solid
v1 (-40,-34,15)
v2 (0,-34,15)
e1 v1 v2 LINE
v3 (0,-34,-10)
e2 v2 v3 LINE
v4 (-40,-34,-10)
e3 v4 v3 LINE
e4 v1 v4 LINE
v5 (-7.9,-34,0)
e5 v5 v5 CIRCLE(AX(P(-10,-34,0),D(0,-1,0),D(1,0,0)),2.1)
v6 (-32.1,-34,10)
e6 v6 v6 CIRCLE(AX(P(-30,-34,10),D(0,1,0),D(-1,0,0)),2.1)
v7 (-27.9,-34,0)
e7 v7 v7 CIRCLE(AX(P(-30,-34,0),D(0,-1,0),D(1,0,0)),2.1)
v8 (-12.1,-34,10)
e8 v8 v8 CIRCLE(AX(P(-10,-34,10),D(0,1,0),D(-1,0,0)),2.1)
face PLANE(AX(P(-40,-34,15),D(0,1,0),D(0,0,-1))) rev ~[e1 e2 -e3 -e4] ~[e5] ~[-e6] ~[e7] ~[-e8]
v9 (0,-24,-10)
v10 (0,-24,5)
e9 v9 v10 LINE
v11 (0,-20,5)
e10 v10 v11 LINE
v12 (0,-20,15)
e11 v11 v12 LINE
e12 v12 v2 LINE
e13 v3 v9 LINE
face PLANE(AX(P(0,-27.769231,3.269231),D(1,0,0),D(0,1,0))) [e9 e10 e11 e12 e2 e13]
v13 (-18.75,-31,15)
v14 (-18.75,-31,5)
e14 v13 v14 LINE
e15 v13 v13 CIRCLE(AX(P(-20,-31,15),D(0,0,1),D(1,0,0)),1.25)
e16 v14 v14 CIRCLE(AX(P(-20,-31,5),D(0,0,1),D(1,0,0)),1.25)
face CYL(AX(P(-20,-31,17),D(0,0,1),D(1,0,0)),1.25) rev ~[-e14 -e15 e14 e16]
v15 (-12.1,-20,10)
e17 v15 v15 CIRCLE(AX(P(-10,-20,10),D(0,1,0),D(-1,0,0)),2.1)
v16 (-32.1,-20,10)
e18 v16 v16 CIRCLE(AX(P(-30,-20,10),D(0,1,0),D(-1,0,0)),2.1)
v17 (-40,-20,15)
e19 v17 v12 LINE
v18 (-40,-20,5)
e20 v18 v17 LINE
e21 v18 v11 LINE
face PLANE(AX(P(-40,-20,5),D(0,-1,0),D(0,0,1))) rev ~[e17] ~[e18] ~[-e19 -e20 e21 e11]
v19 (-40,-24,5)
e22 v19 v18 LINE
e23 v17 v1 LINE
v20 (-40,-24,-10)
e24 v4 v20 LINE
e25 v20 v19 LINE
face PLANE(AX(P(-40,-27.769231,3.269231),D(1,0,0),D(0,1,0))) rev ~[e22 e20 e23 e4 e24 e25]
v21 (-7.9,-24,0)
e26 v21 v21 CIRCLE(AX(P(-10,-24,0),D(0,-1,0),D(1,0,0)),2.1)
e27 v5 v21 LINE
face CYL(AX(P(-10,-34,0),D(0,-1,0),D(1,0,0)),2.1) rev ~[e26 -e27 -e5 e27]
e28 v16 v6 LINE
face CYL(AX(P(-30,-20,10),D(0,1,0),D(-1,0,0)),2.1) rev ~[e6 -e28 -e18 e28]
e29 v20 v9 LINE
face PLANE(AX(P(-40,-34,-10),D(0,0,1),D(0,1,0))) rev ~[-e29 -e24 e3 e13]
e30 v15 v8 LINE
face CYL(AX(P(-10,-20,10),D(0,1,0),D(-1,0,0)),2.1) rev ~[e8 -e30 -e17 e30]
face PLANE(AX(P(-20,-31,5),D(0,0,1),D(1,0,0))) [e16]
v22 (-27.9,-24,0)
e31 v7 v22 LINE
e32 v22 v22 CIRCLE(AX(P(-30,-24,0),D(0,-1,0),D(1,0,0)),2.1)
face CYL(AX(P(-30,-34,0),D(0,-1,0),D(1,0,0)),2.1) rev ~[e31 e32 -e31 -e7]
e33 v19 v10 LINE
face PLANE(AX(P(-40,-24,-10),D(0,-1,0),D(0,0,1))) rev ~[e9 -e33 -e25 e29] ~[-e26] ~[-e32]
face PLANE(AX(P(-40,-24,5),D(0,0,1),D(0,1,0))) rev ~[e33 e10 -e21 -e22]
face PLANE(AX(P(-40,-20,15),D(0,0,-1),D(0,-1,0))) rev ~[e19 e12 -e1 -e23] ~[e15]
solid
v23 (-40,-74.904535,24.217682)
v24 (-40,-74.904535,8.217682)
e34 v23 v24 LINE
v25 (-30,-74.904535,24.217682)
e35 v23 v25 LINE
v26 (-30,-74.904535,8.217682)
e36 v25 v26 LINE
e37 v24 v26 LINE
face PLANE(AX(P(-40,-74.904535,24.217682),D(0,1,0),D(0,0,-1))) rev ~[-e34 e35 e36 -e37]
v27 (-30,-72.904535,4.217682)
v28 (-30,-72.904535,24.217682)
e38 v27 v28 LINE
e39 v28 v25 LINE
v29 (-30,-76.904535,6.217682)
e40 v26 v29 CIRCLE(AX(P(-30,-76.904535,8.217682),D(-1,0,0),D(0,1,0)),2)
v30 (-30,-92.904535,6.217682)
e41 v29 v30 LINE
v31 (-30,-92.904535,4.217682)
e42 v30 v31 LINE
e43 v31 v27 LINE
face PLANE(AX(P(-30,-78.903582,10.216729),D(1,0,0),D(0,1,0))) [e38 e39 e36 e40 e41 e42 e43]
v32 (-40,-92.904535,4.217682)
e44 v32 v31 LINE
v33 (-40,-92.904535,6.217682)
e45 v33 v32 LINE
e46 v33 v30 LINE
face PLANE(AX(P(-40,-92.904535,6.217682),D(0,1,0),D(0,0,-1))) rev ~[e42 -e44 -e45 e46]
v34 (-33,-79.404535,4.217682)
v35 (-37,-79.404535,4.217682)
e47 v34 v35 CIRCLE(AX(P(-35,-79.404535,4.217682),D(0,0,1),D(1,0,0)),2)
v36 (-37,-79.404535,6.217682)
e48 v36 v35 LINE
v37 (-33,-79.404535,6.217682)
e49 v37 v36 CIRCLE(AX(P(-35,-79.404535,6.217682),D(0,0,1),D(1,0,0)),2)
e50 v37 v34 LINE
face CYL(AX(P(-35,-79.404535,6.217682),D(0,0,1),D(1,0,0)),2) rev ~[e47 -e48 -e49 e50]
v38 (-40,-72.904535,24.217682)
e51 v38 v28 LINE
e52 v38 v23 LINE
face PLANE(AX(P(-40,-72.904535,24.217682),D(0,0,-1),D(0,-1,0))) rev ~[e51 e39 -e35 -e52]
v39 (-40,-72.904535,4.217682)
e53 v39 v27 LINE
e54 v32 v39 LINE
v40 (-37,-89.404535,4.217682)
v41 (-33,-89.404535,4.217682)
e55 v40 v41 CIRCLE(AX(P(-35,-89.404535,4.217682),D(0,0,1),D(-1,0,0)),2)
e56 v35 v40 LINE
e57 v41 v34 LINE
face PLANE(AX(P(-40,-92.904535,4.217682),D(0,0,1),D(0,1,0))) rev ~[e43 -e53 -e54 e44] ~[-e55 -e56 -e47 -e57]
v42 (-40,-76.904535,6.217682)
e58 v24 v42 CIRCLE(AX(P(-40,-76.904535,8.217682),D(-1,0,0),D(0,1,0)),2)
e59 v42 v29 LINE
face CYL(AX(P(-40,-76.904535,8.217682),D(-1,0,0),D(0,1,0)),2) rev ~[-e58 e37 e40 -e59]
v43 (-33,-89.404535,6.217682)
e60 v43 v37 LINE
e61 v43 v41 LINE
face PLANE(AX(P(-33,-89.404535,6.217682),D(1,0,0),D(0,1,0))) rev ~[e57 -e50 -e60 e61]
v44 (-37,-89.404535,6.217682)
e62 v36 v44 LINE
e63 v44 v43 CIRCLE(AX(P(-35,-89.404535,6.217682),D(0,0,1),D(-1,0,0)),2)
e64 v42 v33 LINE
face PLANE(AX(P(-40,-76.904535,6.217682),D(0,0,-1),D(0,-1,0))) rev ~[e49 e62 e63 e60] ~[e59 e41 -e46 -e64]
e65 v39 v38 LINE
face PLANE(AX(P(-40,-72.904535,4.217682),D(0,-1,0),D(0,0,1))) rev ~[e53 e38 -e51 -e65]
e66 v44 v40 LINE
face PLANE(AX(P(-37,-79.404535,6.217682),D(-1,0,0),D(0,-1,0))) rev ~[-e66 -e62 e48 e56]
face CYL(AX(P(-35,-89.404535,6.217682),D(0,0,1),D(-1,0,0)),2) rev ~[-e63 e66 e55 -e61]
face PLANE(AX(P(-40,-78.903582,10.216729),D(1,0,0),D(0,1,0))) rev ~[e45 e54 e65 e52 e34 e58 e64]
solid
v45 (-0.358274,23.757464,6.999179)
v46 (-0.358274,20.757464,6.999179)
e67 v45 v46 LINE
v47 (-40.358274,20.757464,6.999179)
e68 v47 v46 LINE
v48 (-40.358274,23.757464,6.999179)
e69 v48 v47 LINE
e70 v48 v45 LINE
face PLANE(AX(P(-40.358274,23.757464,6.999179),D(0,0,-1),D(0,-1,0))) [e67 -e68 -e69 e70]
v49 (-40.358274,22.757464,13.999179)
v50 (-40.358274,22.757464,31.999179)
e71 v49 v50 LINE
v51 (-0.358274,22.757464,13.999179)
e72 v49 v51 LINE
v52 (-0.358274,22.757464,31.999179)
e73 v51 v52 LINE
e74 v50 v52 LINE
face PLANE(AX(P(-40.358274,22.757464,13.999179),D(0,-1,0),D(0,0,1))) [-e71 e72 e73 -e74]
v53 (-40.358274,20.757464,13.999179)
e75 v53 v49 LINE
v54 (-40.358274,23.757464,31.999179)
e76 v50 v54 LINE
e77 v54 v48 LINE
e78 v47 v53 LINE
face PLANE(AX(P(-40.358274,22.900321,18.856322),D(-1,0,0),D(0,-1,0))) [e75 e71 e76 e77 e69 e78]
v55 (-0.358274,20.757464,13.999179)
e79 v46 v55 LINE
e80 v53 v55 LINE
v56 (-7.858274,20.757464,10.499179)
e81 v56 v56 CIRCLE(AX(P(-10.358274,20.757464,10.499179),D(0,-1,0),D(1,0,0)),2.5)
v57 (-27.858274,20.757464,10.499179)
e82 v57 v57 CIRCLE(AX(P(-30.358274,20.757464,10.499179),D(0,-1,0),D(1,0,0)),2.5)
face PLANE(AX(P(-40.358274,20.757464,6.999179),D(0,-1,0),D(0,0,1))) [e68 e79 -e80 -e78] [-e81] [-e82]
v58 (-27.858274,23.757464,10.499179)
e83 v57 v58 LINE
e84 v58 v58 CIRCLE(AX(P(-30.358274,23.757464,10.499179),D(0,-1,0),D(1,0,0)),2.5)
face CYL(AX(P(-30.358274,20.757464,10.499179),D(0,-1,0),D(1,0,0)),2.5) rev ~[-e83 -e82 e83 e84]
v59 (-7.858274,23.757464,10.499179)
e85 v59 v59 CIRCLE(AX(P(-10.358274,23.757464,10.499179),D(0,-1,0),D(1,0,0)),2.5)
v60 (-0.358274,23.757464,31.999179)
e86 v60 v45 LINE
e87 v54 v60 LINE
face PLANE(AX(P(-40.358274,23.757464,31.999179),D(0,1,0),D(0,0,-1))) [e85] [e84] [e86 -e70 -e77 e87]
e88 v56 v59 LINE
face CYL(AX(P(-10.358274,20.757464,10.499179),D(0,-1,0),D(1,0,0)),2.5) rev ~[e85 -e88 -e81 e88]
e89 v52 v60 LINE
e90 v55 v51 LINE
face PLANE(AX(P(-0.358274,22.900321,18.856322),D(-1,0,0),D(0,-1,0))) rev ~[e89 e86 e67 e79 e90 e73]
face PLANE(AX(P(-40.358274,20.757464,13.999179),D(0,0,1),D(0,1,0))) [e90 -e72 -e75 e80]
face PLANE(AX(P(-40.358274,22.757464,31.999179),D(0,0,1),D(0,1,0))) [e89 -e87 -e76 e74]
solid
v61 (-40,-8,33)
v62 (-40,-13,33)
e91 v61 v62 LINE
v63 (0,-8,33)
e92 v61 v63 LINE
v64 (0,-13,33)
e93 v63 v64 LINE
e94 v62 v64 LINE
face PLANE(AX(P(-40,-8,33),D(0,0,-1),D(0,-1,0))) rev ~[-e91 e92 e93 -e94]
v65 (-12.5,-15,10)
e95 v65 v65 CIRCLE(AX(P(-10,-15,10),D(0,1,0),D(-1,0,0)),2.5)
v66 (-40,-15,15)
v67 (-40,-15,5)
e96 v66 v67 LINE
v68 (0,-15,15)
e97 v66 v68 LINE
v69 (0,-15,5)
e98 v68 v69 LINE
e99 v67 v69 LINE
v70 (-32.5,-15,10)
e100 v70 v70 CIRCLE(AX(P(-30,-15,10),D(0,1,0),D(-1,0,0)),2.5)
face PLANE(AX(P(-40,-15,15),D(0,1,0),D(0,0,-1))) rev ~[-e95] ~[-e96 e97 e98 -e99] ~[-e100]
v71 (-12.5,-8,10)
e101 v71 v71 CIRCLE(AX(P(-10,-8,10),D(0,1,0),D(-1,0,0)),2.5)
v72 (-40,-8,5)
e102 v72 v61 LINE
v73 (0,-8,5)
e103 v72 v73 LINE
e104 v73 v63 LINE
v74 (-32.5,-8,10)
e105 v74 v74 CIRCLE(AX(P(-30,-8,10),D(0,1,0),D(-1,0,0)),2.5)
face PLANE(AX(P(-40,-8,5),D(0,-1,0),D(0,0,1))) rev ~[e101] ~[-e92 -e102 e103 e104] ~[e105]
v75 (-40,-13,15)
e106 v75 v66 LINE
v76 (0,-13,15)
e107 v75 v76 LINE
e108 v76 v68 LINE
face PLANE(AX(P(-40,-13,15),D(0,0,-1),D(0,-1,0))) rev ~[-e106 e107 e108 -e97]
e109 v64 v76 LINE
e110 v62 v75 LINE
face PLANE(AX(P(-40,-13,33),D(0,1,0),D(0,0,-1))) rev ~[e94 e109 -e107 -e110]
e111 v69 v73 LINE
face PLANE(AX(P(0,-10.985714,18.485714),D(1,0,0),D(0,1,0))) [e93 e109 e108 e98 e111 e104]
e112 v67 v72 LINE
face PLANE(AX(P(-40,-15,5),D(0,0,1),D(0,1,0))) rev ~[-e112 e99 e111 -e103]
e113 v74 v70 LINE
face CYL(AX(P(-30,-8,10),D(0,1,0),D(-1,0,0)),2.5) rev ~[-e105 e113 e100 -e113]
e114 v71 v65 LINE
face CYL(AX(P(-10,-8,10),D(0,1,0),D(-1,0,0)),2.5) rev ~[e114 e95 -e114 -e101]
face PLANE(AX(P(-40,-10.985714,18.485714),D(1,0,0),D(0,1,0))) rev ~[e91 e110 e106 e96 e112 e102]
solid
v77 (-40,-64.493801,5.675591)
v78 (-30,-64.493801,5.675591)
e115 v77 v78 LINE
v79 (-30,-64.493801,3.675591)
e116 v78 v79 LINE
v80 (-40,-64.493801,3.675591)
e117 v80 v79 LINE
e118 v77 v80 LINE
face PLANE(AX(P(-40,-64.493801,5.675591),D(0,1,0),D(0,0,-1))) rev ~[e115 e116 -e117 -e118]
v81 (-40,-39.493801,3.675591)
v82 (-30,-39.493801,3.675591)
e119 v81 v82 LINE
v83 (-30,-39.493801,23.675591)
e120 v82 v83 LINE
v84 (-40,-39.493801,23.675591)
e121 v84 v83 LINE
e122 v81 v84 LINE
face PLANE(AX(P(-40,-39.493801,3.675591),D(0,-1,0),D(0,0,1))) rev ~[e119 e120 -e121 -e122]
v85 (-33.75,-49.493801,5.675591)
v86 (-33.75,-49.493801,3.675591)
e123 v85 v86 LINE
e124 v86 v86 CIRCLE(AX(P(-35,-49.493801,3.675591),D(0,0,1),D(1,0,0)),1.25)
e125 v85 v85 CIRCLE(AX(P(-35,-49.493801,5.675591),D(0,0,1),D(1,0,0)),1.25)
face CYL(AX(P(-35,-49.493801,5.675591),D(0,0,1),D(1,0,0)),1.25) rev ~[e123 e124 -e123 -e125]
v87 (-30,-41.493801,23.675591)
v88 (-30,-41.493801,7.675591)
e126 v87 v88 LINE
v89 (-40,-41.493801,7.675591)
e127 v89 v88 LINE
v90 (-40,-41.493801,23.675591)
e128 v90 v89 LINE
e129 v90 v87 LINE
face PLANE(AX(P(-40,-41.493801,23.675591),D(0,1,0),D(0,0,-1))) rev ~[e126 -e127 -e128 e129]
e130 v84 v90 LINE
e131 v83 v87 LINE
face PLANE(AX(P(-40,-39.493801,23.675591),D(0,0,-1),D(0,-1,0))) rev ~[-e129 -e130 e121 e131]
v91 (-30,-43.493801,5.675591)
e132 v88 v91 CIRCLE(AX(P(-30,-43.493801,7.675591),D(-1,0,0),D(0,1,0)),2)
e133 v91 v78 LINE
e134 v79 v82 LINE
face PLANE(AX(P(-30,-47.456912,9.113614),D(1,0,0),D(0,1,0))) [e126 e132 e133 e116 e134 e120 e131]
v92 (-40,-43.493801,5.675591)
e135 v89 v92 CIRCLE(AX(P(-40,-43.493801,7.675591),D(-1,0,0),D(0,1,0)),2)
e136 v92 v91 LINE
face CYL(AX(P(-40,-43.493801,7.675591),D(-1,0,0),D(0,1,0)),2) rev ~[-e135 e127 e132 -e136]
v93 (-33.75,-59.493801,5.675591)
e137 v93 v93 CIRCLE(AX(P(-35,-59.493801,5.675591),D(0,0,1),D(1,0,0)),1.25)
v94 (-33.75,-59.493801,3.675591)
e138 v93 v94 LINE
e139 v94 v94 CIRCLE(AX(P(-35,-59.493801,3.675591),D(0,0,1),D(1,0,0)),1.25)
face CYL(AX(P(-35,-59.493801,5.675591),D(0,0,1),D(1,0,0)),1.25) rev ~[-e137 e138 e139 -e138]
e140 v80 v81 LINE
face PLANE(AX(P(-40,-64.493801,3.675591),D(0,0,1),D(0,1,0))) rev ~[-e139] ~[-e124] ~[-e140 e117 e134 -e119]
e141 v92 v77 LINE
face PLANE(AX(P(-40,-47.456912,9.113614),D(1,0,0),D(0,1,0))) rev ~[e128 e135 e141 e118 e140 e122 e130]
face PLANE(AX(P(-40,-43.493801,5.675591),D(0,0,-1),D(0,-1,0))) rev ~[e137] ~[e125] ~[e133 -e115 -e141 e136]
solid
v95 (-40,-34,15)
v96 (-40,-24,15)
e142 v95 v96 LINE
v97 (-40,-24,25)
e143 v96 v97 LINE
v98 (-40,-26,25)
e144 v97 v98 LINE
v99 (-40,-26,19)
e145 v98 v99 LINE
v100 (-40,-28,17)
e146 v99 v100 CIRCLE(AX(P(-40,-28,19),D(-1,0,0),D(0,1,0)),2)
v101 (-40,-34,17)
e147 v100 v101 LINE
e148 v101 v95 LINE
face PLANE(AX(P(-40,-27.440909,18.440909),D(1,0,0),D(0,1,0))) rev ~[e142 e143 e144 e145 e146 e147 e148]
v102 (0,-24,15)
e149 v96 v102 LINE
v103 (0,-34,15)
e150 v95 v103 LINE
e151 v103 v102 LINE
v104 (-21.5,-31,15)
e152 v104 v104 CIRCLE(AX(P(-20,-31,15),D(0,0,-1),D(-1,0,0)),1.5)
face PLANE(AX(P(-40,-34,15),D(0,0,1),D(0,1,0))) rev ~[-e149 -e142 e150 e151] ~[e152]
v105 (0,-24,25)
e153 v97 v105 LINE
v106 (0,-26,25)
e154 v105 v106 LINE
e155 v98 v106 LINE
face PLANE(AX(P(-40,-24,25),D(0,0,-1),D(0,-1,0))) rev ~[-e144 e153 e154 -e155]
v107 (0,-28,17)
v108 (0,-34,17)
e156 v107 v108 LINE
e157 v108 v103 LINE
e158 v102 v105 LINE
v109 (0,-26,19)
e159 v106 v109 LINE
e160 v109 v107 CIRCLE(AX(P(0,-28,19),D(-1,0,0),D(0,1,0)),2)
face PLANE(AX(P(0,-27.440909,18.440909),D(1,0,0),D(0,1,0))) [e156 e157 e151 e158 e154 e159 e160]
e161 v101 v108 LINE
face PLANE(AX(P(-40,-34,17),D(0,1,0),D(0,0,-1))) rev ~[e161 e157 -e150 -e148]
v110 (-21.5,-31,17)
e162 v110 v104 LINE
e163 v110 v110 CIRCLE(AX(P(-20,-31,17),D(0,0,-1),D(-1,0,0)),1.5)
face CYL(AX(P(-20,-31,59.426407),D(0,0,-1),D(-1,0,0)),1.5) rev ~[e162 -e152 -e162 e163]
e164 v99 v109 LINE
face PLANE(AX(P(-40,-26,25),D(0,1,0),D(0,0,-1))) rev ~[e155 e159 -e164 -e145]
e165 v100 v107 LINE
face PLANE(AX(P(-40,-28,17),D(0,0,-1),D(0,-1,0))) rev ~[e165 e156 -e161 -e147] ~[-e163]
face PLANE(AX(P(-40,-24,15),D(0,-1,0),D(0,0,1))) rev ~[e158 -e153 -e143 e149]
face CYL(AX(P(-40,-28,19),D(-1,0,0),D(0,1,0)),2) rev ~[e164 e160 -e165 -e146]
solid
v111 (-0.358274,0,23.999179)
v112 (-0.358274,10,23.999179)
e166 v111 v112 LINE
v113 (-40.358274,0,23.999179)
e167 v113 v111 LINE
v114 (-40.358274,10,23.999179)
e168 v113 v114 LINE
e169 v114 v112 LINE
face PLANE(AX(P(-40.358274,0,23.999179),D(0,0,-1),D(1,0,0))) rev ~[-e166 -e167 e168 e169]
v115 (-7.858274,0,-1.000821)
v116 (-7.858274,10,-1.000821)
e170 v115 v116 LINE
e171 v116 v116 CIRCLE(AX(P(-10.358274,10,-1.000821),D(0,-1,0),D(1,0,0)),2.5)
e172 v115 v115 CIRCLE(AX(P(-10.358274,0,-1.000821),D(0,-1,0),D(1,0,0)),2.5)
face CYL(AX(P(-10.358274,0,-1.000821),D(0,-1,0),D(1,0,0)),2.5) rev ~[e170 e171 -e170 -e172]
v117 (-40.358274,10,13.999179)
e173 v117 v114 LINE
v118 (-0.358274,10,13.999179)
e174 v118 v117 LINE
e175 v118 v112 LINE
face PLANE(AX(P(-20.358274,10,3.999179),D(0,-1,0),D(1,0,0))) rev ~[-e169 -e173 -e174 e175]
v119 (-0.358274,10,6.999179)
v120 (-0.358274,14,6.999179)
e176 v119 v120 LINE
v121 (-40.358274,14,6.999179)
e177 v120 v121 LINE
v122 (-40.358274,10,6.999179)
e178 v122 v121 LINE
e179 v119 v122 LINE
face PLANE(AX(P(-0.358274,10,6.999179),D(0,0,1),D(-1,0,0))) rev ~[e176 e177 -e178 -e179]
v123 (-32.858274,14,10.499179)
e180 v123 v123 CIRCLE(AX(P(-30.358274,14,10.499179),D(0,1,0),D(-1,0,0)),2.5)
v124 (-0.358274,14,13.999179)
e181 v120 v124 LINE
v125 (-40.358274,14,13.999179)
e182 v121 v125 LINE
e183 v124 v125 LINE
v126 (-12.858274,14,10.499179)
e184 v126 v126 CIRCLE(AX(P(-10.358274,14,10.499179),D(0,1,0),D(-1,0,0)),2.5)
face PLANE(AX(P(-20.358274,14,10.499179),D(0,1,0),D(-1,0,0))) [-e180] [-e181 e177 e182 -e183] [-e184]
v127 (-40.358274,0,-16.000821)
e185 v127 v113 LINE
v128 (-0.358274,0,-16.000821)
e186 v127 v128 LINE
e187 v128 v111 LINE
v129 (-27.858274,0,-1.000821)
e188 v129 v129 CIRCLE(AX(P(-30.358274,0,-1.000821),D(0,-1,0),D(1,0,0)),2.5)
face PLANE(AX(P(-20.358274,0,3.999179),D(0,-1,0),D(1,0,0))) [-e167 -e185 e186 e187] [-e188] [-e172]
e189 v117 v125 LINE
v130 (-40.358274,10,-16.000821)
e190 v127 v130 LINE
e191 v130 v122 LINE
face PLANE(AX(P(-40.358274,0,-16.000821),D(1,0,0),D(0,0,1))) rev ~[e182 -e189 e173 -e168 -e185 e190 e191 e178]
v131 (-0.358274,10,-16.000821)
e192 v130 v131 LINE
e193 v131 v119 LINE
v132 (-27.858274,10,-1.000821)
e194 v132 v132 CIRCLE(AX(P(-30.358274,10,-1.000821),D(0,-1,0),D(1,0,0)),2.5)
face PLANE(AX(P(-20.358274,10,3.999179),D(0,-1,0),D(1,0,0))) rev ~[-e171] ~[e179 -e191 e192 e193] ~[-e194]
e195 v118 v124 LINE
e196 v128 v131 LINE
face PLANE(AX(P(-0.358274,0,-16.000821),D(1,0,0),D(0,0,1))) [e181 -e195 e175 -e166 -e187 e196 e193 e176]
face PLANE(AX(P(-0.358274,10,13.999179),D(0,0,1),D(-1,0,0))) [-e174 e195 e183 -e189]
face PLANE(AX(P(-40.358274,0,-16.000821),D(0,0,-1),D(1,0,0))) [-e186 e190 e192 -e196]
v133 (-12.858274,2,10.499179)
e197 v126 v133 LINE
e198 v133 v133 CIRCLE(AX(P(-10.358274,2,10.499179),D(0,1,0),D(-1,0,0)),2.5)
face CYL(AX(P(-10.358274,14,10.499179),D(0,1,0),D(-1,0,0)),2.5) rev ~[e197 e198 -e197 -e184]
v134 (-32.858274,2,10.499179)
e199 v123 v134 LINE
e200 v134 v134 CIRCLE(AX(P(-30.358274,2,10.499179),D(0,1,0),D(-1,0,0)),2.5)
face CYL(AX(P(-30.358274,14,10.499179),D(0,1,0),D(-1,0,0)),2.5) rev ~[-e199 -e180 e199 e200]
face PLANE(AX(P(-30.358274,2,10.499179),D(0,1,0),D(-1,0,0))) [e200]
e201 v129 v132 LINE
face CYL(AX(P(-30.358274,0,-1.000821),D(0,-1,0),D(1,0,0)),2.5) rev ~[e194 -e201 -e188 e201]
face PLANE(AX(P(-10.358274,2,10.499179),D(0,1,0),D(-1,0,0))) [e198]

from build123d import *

# Parameters (mm, degrees)
F1_W      = 40
F1_H      = 40
F1_R      = 2.5
F2_DEPTH  = 10
F3_W      = 40
F3_H      = 7
F4_DEPTH  = 4
F5_R      = 2.5
F6_DEPTH  = 12
F8_DEPTH  = 40
F9_R      = 2.5
F10_DEPTH = 3
F12_DEPTH = 40
F14_DEPTH = 40
F18_DEPTH = 40
F15_R     = 2.1
F20_DEPTH = 10
F16_R     = 2.5
F21_DEPTH = 7
F19_R     = 1.25
F22_DEPTH = 12
F24_DEPTH = 10
F25_R     = 1.25
F26_DEPTH = 2
F28_DEPTH = 10
F30_DEPTH = 3
F31_R     = 2.1
F32_DEPTH = 14
F33_D     = 3


# Not quite as in the source:
# - a feature names something its author has since deleted; it is built from what else it names


with BuildPart() as f2:
    # F1 (on Front) → F2 (new body)
    with BuildSketch(Plane.XZ):
        with Locations((-20.3582742298, 3.9991794988)):
            Rectangle(F1_W, F1_H)
        with Locations((-30.3582742298, -1.0008205012)):
            Circle(F1_R, mode=Mode.SUBTRACT)
        with Locations((-10.3582742298, -1.0008205012)):
            Circle(F1_R, mode=Mode.SUBTRACT)
    extrude(amount=-F2_DEPTH)

    # F3 (on face) → F4 (join)
    with BuildSketch(Plane(origin=(0, 10, 0), x_dir=(-1, 0, 0), z_dir=(0, 1, 0))):
        with Locations((20.3582742298, 10.4991794988)):
            Rectangle(F3_W, F3_H)
    extrude(amount=F4_DEPTH)

    # F5 (on face) → F6 (cut)
    with BuildSketch(Plane(origin=(0, 14, 0), x_dir=(-1, 0, 0), z_dir=(0, 1, 0))):
        with Locations((10.3582742298, 10.4991794988)):
            Circle(F5_R)
        with Locations((30.3582742298, 10.4991794988)):
            Circle(F5_R)
    extrude(amount=-F6_DEPTH, mode=Mode.SUBTRACT)


with BuildPart() as f8:
    # F7 (on face) → F8 (new body)
    with BuildSketch(Plane(origin=(-40.3582742298, 0, 0), x_dir=(0, -1, 0), z_dir=(-1, 0, 0))):
        Polygon((-22.7574642788, 31.9991794988), (-23.7574642788, 31.9991794988), (-23.7574642788, 6.9991794988), (-20.7574642788, 6.9991794988), (-20.7574642788, 13.9991794988), (-22.7574642788, 13.9991794988), align=None)
    extrude(amount=-F8_DEPTH)

    # F9 (on face) → F10 (cut)
    with BuildSketch(Plane.XZ.offset(-20.7574642788)):
        with Locations((-30.3582742298, 10.4991794988)):
            Circle(F9_R)
        with Locations((-10.3582742298, 10.4991794988)):
            Circle(F9_R)
    extrude(amount=-F10_DEPTH, mode=Mode.SUBTRACT)


with BuildPart() as f12:
    # F11 (on offset) → F12 (new body)
    with BuildSketch(Plane.YZ.offset(-40)):
        Polygon((-20, 5), (-20, 15), (-34, 15), (-34, -10), (-24, -10), (-24, 5), align=None)
    extrude(amount=F12_DEPTH)

    # F15 (on face) → F20 (cut)
    with BuildSketch(Plane.XZ.offset(34)):
        with Locations((-30, 0)):
            Circle(F15_R)
        with Locations((-10, 0)):
            Circle(F15_R)
    extrude(amount=-F20_DEPTH, mode=Mode.SUBTRACT)


with BuildPart() as f14:
    # F13 (on offset) → F14 (new body)
    with BuildSketch(Plane.YZ.offset(-40)):
        Polygon((-8, 5), (-8, 33), (-13, 33), (-13, 15), (-15, 15), (-15, 5), align=None)
    extrude(amount=F14_DEPTH)

    # F16 (on face) → F21 (cut)
    with BuildSketch(Plane(origin=(0, -8, 0), x_dir=(-1, 0, 0), z_dir=(0, 1, 0))):
        with Locations((10, 10)):
            Circle(F16_R)
        with Locations((30, 10)):
            Circle(F16_R)
    extrude(amount=-F21_DEPTH, mode=Mode.SUBTRACT)


with BuildPart() as f18:
    # F17 (on offset) → F18 (new body)
    with BuildSketch(Plane.YZ.offset(-40)):
        with BuildLine():
            Line((-24, 15), (-24, 25))
            Line((-24, 25), (-26, 25))
            Line((-26, 25), (-26, 19))
            ThreePointArc((-26, 19), (-26.5857864376, 17.5857864376), (-28, 17))
            Line((-28, 17), (-34, 17))
            Line((-34, 17), (-34, 15))
            Line((-34, 15), (-24, 15))
        make_face()
    extrude(amount=F18_DEPTH)


with BuildPart() as f22_tool:
    # F19 (on face) → F22 (new body)
    with BuildSketch(Plane.XY.offset(17)):
        with Locations((-20, -31)):
            Circle(F19_R)
    extrude(amount=-F22_DEPTH)


with BuildPart() as f12_1:
    add(f12.part)

    # F22: cut by f22_tool
    add(f22_tool.part, mode=Mode.SUBTRACT)

    # F31 (on face) → F32 (cut)
    with BuildSketch(Plane(origin=(0, -20, 0), x_dir=(-1, 0, 0), z_dir=(0, 1, 0))):
        with Locations((30, 10)):
            Circle(F31_R)
        with Locations((10, 10)):
            Circle(F31_R)
    extrude(amount=-F32_DEPTH, mode=Mode.SUBTRACT)


with BuildPart() as f18_1:
    add(f18.part)

    # F22: cut by f22_tool
    add(f22_tool.part, mode=Mode.SUBTRACT)

    # F33 (through all)
    with Locations(Plane.XY.offset(17)):
        with Locations((-20, -31)):
            Hole(F33_D / 2)


with BuildPart() as f24:
    # F23 (on offset) → F24 (new body)
    with BuildSketch(Plane.YZ.offset(-40)):
        with BuildLine():
            Line((-39.4938005805, 3.6755907349), (-39.4938005805, 23.6755907349))
            Line((-39.4938005805, 23.6755907349), (-41.4938005805, 23.6755907349))
            Line((-41.4938005805, 23.6755907349), (-41.4938005805, 7.6755907349))
            ThreePointArc((-41.4938005805, 7.6755907349), (-42.0795870181, 6.2613771726), (-43.4938005805, 5.6755907349))
            Line((-43.4938005805, 5.6755907349), (-64.4938005805, 5.6755907349))
            Line((-64.4938005805, 5.6755907349), (-64.4938005805, 3.6755907349))
            Line((-64.4938005805, 3.6755907349), (-39.4938005805, 3.6755907349))
        make_face()
    extrude(amount=F24_DEPTH)

    # F25 (on face) → F26 (cut)
    with BuildSketch(Plane.XY.offset(5.6755907349)):
        with Locations((-35, -49.4938005805)):
            Circle(F25_R)
        with Locations((-35, -59.4938005805)):
            Circle(F25_R)
    extrude(amount=-F26_DEPTH, mode=Mode.SUBTRACT)


with BuildPart() as f28:
    # F27 (on offset) → F28 (new body)
    with BuildSketch(Plane.YZ.offset(-40)):
        with BuildLine():
            Line((-72.9045346379, 4.2176819406), (-72.9045346379, 24.2176819406))
            Line((-72.9045346379, 24.2176819406), (-74.9045346379, 24.2176819406))
            Line((-74.9045346379, 24.2176819406), (-74.9045346379, 8.2176819406))
            ThreePointArc((-74.9045346379, 8.2176819406), (-75.4903210756, 6.8034683783), (-76.9045346379, 6.2176819406))
            Line((-76.9045346379, 6.2176819406), (-92.9045346379, 6.2176819406))
            Line((-92.9045346379, 6.2176819406), (-92.9045346379, 4.2176819406))
            Line((-92.9045346379, 4.2176819406), (-72.9045346379, 4.2176819406))
        make_face()
    extrude(amount=F28_DEPTH)

    # F29 (on face) → F30 (cut)
    with BuildSketch(Plane.XY.offset(6.2176819406)):
        with BuildLine():
            Line((-37, -79.4045346379), (-37, -89.4045346379))
            ThreePointArc((-37, -89.4045346379), (-35, -91.4045346379), (-33, -89.4045346379))
            Line((-33, -89.4045346379), (-33, -79.4045346379))
            ThreePointArc((-33, -79.4045346379), (-35, -77.4045346379), (-37, -79.4045346379))
        make_face()
    extrude(amount=-F30_DEPTH, mode=Mode.SUBTRACT)


solid = Compound([f2.part, f8.part, f14.part, f12_1.part, f18_1.part, f24.part, f28.part])
